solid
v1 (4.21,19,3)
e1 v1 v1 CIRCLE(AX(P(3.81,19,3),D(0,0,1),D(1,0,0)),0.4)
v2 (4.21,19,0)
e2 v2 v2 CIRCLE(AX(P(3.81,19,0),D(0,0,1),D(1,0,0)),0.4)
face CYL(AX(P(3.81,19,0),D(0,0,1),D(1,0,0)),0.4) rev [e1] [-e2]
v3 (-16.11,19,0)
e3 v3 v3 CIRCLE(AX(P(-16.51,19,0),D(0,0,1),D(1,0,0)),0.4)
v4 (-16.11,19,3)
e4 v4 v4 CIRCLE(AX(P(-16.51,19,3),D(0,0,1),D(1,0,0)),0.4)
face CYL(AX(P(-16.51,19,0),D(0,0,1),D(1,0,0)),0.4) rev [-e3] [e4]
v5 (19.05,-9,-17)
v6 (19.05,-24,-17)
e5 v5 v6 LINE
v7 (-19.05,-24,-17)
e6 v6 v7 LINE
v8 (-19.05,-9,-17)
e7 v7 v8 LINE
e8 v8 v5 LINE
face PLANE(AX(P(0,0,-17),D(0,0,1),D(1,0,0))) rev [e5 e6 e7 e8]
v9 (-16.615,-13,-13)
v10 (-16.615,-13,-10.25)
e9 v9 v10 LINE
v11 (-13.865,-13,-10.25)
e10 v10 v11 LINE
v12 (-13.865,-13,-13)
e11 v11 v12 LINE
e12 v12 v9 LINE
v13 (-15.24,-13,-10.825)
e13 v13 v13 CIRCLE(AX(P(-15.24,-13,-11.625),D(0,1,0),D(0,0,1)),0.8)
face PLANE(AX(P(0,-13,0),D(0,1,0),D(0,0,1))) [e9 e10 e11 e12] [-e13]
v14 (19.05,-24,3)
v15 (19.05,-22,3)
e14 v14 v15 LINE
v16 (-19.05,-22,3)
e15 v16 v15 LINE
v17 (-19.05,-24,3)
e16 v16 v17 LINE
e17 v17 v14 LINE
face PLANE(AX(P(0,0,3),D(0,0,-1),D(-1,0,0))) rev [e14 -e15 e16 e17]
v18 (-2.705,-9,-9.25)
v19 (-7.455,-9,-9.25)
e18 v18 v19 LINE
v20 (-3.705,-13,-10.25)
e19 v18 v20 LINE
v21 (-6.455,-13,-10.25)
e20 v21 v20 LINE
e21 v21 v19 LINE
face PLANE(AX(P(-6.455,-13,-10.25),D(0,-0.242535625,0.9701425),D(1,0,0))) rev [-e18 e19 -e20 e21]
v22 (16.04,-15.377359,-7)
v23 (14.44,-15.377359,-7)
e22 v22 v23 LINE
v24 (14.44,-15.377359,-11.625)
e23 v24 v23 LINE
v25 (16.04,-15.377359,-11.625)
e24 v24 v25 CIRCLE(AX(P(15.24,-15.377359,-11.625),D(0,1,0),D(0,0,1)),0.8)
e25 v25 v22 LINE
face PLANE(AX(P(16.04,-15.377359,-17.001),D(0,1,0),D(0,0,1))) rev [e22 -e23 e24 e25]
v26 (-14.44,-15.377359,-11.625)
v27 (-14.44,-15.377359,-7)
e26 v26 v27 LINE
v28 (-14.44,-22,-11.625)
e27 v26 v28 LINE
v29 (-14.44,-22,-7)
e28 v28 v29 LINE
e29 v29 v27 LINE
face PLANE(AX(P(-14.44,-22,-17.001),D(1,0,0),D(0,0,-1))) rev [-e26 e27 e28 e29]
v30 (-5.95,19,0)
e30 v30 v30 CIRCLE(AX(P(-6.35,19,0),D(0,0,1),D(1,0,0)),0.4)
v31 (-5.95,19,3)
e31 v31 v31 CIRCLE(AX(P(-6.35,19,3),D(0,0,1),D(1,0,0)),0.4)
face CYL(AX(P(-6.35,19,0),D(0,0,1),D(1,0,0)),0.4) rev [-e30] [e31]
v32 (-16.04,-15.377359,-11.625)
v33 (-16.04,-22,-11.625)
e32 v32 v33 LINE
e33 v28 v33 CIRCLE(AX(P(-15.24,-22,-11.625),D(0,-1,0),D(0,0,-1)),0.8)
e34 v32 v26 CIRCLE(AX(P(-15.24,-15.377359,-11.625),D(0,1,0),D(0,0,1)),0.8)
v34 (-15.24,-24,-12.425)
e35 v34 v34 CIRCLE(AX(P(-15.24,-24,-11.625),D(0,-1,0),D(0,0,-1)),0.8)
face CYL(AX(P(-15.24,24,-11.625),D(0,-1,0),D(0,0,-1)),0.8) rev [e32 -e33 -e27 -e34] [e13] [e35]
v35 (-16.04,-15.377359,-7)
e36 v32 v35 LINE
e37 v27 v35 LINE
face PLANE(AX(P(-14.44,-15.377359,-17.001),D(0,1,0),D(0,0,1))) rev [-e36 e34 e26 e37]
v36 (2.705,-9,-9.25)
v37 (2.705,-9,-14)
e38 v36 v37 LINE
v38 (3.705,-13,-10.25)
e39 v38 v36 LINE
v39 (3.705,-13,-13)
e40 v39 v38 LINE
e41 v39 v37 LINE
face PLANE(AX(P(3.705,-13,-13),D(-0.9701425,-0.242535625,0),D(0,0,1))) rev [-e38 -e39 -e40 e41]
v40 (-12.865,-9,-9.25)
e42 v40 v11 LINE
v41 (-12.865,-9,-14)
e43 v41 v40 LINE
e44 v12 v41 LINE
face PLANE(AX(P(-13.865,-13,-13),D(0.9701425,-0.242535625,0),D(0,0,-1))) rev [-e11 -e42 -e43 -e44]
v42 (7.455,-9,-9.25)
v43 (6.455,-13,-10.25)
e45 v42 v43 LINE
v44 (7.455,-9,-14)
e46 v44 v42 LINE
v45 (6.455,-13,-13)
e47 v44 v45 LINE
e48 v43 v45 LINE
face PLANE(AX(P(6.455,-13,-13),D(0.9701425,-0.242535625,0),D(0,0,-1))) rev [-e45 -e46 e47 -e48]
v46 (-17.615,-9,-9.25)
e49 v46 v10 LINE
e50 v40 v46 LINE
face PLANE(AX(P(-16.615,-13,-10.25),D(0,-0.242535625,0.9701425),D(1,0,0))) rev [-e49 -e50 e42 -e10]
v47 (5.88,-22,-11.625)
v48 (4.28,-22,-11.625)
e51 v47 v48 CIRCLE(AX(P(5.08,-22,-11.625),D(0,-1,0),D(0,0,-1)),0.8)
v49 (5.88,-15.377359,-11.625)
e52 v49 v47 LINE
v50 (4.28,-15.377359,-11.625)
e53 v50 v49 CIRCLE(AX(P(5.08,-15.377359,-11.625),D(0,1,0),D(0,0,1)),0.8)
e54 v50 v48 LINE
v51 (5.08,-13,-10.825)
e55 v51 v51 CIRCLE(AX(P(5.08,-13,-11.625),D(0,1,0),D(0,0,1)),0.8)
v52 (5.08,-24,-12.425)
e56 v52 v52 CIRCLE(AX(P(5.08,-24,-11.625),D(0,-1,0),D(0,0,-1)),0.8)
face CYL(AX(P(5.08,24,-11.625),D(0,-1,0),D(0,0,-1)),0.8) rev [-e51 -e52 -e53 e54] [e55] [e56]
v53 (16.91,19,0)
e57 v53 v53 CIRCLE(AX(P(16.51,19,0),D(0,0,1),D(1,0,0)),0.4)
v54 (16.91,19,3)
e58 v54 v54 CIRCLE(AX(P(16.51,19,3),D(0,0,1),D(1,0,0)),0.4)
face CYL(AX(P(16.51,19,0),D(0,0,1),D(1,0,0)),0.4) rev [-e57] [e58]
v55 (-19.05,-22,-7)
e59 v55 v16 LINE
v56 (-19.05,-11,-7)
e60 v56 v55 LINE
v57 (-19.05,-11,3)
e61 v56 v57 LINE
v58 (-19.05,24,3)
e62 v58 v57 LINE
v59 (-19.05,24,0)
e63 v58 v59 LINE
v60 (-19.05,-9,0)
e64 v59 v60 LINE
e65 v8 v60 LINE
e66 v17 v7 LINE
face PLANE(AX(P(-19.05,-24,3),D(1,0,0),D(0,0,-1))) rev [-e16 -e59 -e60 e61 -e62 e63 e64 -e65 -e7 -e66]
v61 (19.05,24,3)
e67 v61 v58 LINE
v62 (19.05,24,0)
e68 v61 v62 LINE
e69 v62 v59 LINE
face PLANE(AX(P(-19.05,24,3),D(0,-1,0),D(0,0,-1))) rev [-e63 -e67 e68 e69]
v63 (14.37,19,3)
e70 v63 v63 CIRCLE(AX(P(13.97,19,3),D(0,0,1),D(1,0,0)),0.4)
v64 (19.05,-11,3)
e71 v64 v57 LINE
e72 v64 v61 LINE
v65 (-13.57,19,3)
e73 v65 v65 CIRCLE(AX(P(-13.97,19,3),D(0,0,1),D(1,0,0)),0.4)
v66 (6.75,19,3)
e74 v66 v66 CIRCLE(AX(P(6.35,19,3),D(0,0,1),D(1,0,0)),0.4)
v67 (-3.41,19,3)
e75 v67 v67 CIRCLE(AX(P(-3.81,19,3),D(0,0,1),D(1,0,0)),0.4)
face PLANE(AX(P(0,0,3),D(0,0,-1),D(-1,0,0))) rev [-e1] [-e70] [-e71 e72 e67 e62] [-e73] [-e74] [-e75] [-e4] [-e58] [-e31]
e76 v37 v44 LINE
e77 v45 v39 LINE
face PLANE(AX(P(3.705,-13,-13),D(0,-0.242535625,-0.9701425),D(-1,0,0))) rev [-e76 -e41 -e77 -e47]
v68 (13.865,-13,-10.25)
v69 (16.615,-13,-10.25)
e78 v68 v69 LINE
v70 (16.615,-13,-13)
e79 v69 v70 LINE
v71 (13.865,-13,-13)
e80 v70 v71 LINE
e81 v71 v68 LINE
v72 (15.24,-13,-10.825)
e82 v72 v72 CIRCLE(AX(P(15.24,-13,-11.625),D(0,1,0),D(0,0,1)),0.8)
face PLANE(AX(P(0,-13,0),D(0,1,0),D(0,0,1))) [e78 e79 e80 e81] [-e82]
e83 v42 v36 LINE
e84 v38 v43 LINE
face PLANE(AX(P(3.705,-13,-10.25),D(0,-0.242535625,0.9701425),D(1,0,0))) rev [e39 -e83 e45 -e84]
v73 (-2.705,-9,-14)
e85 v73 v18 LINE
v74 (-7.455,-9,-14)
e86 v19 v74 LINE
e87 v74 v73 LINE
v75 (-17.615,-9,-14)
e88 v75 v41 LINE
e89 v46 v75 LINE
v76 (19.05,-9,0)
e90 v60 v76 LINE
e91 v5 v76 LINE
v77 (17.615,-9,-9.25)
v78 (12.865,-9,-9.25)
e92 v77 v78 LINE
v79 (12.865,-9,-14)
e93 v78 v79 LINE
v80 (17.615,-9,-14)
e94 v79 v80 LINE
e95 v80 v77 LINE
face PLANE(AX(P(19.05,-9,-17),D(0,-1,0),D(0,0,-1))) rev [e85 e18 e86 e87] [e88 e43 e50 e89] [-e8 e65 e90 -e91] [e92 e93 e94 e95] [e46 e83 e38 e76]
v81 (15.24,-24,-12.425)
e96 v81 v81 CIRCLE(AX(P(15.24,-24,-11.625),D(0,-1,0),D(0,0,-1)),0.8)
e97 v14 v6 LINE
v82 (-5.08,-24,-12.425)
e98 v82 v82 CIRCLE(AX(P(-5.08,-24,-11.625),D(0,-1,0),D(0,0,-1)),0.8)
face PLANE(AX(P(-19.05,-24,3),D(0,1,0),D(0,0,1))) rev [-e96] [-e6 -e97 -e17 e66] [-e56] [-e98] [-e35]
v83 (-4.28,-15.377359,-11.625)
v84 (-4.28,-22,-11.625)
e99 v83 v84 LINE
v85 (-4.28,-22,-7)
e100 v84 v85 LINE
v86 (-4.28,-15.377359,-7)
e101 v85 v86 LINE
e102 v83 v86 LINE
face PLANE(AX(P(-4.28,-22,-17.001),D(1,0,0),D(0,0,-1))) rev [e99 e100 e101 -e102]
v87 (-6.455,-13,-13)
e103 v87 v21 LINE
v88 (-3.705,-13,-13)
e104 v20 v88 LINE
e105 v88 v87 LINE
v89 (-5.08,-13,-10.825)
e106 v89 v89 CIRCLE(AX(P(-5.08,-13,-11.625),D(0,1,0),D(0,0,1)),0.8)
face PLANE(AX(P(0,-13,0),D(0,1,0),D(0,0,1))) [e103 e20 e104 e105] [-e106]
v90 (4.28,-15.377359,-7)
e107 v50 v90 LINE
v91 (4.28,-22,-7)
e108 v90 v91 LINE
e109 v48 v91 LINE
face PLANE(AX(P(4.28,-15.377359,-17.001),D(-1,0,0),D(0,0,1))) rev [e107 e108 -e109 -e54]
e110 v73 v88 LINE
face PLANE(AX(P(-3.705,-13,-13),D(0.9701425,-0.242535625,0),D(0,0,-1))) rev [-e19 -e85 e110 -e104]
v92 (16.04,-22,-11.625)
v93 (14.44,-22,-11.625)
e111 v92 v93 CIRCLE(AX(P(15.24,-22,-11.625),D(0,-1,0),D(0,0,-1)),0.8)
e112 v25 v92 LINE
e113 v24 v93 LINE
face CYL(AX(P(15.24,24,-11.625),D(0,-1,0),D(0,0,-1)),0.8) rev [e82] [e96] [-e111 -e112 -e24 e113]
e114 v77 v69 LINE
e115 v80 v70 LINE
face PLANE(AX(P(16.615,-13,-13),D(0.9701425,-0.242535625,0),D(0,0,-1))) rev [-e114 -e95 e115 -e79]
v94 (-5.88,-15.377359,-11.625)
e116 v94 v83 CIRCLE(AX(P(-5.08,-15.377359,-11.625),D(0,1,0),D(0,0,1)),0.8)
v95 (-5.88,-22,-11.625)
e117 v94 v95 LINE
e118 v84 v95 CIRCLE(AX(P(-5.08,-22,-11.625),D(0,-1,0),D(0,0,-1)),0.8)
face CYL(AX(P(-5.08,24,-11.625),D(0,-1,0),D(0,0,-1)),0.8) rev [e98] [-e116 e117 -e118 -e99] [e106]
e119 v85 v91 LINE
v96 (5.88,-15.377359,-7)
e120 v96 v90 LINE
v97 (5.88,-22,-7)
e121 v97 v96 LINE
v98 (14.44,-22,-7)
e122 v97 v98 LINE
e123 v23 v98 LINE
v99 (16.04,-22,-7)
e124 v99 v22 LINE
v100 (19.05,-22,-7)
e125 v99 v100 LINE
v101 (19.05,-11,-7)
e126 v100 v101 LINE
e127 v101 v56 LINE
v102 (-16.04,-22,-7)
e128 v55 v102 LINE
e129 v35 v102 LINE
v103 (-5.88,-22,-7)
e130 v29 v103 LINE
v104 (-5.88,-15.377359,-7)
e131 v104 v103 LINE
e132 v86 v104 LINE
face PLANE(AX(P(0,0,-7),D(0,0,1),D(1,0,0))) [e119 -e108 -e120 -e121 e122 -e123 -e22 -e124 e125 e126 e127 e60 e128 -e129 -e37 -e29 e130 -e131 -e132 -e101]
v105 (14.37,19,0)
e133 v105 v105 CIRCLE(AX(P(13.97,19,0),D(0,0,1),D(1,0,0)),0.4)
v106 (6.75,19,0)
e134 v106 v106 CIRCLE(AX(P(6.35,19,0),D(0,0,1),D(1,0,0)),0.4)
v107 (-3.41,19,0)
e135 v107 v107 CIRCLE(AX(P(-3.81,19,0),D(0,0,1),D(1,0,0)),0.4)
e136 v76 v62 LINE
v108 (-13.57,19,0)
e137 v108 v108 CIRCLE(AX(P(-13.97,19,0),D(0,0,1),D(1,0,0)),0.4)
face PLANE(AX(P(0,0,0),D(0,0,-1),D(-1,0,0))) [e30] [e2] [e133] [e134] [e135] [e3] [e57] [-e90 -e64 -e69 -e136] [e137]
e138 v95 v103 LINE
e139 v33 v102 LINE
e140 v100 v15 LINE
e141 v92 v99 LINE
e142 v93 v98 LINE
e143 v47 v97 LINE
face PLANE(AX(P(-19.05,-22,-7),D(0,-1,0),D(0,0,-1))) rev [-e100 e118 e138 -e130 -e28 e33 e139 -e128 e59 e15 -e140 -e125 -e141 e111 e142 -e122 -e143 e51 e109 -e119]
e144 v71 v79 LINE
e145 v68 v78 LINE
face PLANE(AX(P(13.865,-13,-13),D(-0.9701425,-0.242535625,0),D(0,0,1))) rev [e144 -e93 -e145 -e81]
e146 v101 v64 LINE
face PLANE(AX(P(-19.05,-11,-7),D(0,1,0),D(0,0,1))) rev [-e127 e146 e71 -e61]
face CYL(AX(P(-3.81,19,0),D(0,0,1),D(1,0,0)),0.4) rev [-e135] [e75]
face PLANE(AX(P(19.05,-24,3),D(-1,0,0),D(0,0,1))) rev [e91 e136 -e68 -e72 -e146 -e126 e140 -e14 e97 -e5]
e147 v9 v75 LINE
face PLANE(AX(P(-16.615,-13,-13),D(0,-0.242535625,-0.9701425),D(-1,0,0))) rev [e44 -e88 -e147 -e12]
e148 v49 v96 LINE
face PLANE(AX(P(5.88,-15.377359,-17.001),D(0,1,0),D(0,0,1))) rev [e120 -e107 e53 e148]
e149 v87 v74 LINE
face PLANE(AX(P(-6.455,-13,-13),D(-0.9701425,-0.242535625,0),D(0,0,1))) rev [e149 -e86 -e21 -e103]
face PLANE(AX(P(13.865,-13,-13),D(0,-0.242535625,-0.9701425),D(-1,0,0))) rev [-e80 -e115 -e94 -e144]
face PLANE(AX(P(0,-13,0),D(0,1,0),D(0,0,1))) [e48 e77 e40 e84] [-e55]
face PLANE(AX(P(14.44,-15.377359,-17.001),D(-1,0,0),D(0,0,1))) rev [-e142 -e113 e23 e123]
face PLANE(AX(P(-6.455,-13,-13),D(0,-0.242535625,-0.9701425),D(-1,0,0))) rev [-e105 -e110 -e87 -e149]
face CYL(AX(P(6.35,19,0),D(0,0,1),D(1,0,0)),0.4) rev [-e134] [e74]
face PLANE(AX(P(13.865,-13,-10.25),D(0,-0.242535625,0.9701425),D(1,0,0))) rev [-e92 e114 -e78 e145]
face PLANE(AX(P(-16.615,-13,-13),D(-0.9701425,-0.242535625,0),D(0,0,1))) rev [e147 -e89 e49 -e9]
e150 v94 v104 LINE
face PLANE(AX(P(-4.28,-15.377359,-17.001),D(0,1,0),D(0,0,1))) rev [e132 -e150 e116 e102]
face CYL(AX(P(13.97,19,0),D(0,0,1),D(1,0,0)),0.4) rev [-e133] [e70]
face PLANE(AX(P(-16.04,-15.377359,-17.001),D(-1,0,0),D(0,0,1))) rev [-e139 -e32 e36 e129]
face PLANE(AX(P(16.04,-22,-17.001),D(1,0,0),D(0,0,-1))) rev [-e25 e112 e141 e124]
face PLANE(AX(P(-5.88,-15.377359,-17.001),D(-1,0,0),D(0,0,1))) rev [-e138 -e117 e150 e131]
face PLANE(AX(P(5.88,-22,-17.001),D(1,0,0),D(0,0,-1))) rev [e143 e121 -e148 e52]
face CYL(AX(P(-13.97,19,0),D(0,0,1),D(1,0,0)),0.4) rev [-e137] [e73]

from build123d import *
from OCP.BRepFilletAPI import BRepFilletAPI_MakeChamfer

# Parameters (mm, degrees)
SKETCH_1_W          = 38.1
SKETCH_1_H          = 48
EXTRUDE_1_DEPTH     = 3
SKETCH_2_R          = 0.4
CUT_EXTRUDE_1_DEPTH = 31.78802527
SKETCH_3_W          = 38.1
SKETCH_3_H          = 15
EXTRUDE_2_DEPTH     = 17
SKETCH_4_W          = 2.75
SKETCH_4_H          = 2.75
CUT_EXTRUDE_2_DEPTH = 4
CHAMFER_1_SIZE      = 1
CHAMFER_1_SIZE_2    = 4
SKETCH_5_R          = 0.8
CUT_EXTRUDE_5_DEPTH = 55.36821222
SKETCH_6_W          = 38.1
SKETCH_6_H          = 11
CUT_EXTRUDE_6_DEPTH = 10
CUT_EXTRUDE_7_REACH = 34.232
SKETCH_8_W          = 1.6
SKETCH_8_H          = 6.622641265


with BuildPart() as part:
    # 草圖1 → 填料-伸長1 (new body)
    with BuildSketch(Plane.XY):
        Rectangle(SKETCH_1_W, SKETCH_1_H)
    extrude(amount=EXTRUDE_1_DEPTH)

    # 草圖2 → 除料-伸長1 (cut, through all)
    with BuildSketch(Plane.XY.offset(3)):
        with Locations((-16.51, 19)):
            Circle(SKETCH_2_R)
        with Locations((-13.97, 19)):
            Circle(SKETCH_2_R)
        with Locations((-6.35, 19)):
            Circle(SKETCH_2_R)
        with Locations((-3.81, 19)):
            Circle(SKETCH_2_R)
        with Locations((3.81, 19)):
            Circle(SKETCH_2_R)
        with Locations((6.35, 19)):
            Circle(SKETCH_2_R)
        with Locations((13.97, 19)):
            Circle(SKETCH_2_R)
        with Locations((16.51, 19)):
            Circle(SKETCH_2_R)
    extrude(amount=-CUT_EXTRUDE_1_DEPTH, mode=Mode.SUBTRACT)

    # 草圖3 → 填料-伸長2 (add)
    with BuildSketch(Plane(origin=(0, 0, 0), x_dir=(-1, 0, 0), z_dir=(0, 0, -1))):
        with Locations((0, -16.5)):
            Rectangle(SKETCH_3_W, SKETCH_3_H)
    extrude(amount=EXTRUDE_2_DEPTH)

    # 草圖4 → 除料-伸長2 (cut)
    with BuildSketch(Plane(origin=(0, -9, 0), x_dir=(1, 0, 0), z_dir=(0, 1, 0))):
        with Locations((-15.24, 11.625)):
            Rectangle(SKETCH_4_W, SKETCH_4_H)
        with Locations((-5.08, 11.625)):
            Rectangle(SKETCH_4_W, SKETCH_4_H)
        with Locations((5.08, 11.625)):
            Rectangle(SKETCH_4_W, SKETCH_4_H)
        with Locations((15.24, 11.625)):
            Rectangle(SKETCH_4_W, SKETCH_4_H)
    extrude(amount=-CUT_EXTRUDE_2_DEPTH, mode=Mode.SUBTRACT)

    # 導角1
    chamfer_1_edges_1 = [part.edges().sort_by_distance(p)[0] for p in [
        (-15.24, -9, -13),
    ]]
    chamfer_1_side_1 = [part.faces().sort_by_distance(p)[0] for p in [
        (-15.24, -9, -13.02),
    ]]
    chamfer_1_edges_2 = [part.edges().sort_by_distance(p)[0] for p in [
        (-13.865, -9, -11.625),
    ]]
    chamfer_1_side_2 = [part.faces().sort_by_distance(p)[0] for p in [
        (-13.845, -9, -11.625),
    ]]
    chamfer_1_edges_3 = [part.edges().sort_by_distance(p)[0] for p in [
        (-16.615, -9, -11.625),
    ]]
    chamfer_1_side_3 = [part.faces().sort_by_distance(p)[0] for p in [
        (-16.635, -9, -11.625),
    ]]
    chamfer_1_edges_4 = [part.edges().sort_by_distance(p)[0] for p in [
        (-15.24, -9, -10.25),
    ]]
    chamfer_1_side_4 = [part.faces().sort_by_distance(p)[0] for p in [
        (-15.24, -9, -10.23),
    ]]
    chamfer_1_edges_5 = [part.edges().sort_by_distance(p)[0] for p in [
        (15.24, -9, -10.25),
    ]]
    chamfer_1_side_5 = [part.faces().sort_by_distance(p)[0] for p in [
        (15.24, -9, -10.23),
    ]]
    chamfer_1_edges_6 = [part.edges().sort_by_distance(p)[0] for p in [
        (13.865, -9, -11.625),
    ]]
    chamfer_1_side_6 = [part.faces().sort_by_distance(p)[0] for p in [
        (13.845, -9, -11.625),
    ]]
    chamfer_1_edges_7 = [part.edges().sort_by_distance(p)[0] for p in [
        (16.615, -9, -11.625),
    ]]
    chamfer_1_side_7 = [part.faces().sort_by_distance(p)[0] for p in [
        (16.635, -9, -11.625),
    ]]
    chamfer_1_edges_8 = [part.edges().sort_by_distance(p)[0] for p in [
        (15.24, -9, -13),
    ]]
    chamfer_1_side_8 = [part.faces().sort_by_distance(p)[0] for p in [
        (15.24, -9, -13.02),
    ]]
    chamfer_1_edges_9 = [part.edges().sort_by_distance(p)[0] for p in [
        (5.08, -9, -10.25),
    ]]
    chamfer_1_side_9 = [part.faces().sort_by_distance(p)[0] for p in [
        (5.08, -9, -10.23),
    ]]
    chamfer_1_edges_10 = [part.edges().sort_by_distance(p)[0] for p in [
        (6.455, -9, -11.625),
    ]]
    chamfer_1_side_10 = [part.faces().sort_by_distance(p)[0] for p in [
        (6.475, -9, -11.625),
    ]]
    chamfer_1_edges_11 = [part.edges().sort_by_distance(p)[0] for p in [
        (5.08, -9, -13),
    ]]
    chamfer_1_side_11 = [part.faces().sort_by_distance(p)[0] for p in [
        (5.08, -9, -13.02),
    ]]
    chamfer_1_edges_12 = [part.edges().sort_by_distance(p)[0] for p in [
        (3.705, -9, -11.625),
    ]]
    chamfer_1_side_12 = [part.faces().sort_by_distance(p)[0] for p in [
        (3.685, -9, -11.625),
    ]]
    chamfer_1_edges_13 = [part.edges().sort_by_distance(p)[0] for p in [
        (-5.08, -9, -10.25),
    ]]
    chamfer_1_side_13 = [part.faces().sort_by_distance(p)[0] for p in [
        (-5.08, -9, -10.23),
    ]]
    chamfer_1_edges_14 = [part.edges().sort_by_distance(p)[0] for p in [
        (-6.455, -9, -11.625),
    ]]
    chamfer_1_side_14 = [part.faces().sort_by_distance(p)[0] for p in [
        (-6.475, -9, -11.625),
    ]]
    chamfer_1_edges_15 = [part.edges().sort_by_distance(p)[0] for p in [
        (-5.08, -9, -13),
    ]]
    chamfer_1_side_15 = [part.faces().sort_by_distance(p)[0] for p in [
        (-5.08, -9, -13.02),
    ]]
    chamfer_1_edges_16 = [part.edges().sort_by_distance(p)[0] for p in [
        (-3.705, -9, -11.625),
    ]]
    chamfer_1_side_16 = [part.faces().sort_by_distance(p)[0] for p in [
        (-3.685, -9, -11.625),
    ]]
    chamfer_1 = BRepFilletAPI_MakeChamfer(part.part.solid().wrapped)
    for e in chamfer_1_edges_1:
        chamfer_1.Add(CHAMFER_1_SIZE - 0.0001, CHAMFER_1_SIZE_2 - 0.0001, e.wrapped, chamfer_1_side_1[0].wrapped)
    for e in chamfer_1_edges_2:
        chamfer_1.Add(CHAMFER_1_SIZE - 0.0001, CHAMFER_1_SIZE_2 - 0.0001, e.wrapped, chamfer_1_side_2[0].wrapped)
    for e in chamfer_1_edges_3:
        chamfer_1.Add(CHAMFER_1_SIZE - 0.0001, CHAMFER_1_SIZE_2 - 0.0001, e.wrapped, chamfer_1_side_3[0].wrapped)
    for e in chamfer_1_edges_4:
        chamfer_1.Add(CHAMFER_1_SIZE - 0.0001, CHAMFER_1_SIZE_2 - 0.0001, e.wrapped, chamfer_1_side_4[0].wrapped)
    for e in chamfer_1_edges_5:
        chamfer_1.Add(CHAMFER_1_SIZE - 0.0001, CHAMFER_1_SIZE_2 - 0.0001, e.wrapped, chamfer_1_side_5[0].wrapped)
    for e in chamfer_1_edges_6:
        chamfer_1.Add(CHAMFER_1_SIZE - 0.0001, CHAMFER_1_SIZE_2 - 0.0001, e.wrapped, chamfer_1_side_6[0].wrapped)
    for e in chamfer_1_edges_7:
        chamfer_1.Add(CHAMFER_1_SIZE - 0.0001, CHAMFER_1_SIZE_2 - 0.0001, e.wrapped, chamfer_1_side_7[0].wrapped)
    for e in chamfer_1_edges_8:
        chamfer_1.Add(CHAMFER_1_SIZE - 0.0001, CHAMFER_1_SIZE_2 - 0.0001, e.wrapped, chamfer_1_side_8[0].wrapped)
    for e in chamfer_1_edges_9:
        chamfer_1.Add(CHAMFER_1_SIZE - 0.0001, CHAMFER_1_SIZE_2 - 0.0001, e.wrapped, chamfer_1_side_9[0].wrapped)
    for e in chamfer_1_edges_10:
        chamfer_1.Add(CHAMFER_1_SIZE - 0.0001, CHAMFER_1_SIZE_2 - 0.0001, e.wrapped, chamfer_1_side_10[0].wrapped)
    for e in chamfer_1_edges_11:
        chamfer_1.Add(CHAMFER_1_SIZE - 0.0001, CHAMFER_1_SIZE_2 - 0.0001, e.wrapped, chamfer_1_side_11[0].wrapped)
    for e in chamfer_1_edges_12:
        chamfer_1.Add(CHAMFER_1_SIZE - 0.0001, CHAMFER_1_SIZE_2 - 0.0001, e.wrapped, chamfer_1_side_12[0].wrapped)
    for e in chamfer_1_edges_13:
        chamfer_1.Add(CHAMFER_1_SIZE - 0.0001, CHAMFER_1_SIZE_2 - 0.0001, e.wrapped, chamfer_1_side_13[0].wrapped)
    for e in chamfer_1_edges_14:
        chamfer_1.Add(CHAMFER_1_SIZE - 0.0001, CHAMFER_1_SIZE_2 - 0.0001, e.wrapped, chamfer_1_side_14[0].wrapped)
    for e in chamfer_1_edges_15:
        chamfer_1.Add(CHAMFER_1_SIZE - 0.0001, CHAMFER_1_SIZE_2 - 0.0001, e.wrapped, chamfer_1_side_15[0].wrapped)
    for e in chamfer_1_edges_16:
        chamfer_1.Add(CHAMFER_1_SIZE - 0.0001, CHAMFER_1_SIZE_2 - 0.0001, e.wrapped, chamfer_1_side_16[0].wrapped)
    add(Compound.cast(chamfer_1.Shape()), mode=Mode.REPLACE)  # a hair under: the kernel refuses the full size

    # 草圖5 → 除料-伸長5 (cut, through all)
    with BuildSketch(Plane.XZ.offset(24)):
        with Locations(Location((-15.24, -11.625, 0), (0, 0, 270))):
            Circle(SKETCH_5_R)
        with Locations(Location((-5.08, -11.625, 0), (0, 0, 270))):
            Circle(SKETCH_5_R)
        with Locations(Location((5.08, -11.625, 0), (0, 0, 270))):
            Circle(SKETCH_5_R)
        with Locations(Location((15.24, -11.625, 0), (0, 0, 270))):
            Circle(SKETCH_5_R)
    extrude(amount=-CUT_EXTRUDE_5_DEPTH, mode=Mode.SUBTRACT)

    # 草圖6 → 除料-伸長6 (cut)
    with BuildSketch(Plane.XY.offset(3)):
        with Locations((0, -16.5)):
            Rectangle(SKETCH_6_W, SKETCH_6_H)
    extrude(amount=-CUT_EXTRUDE_6_DEPTH, mode=Mode.SUBTRACT)

    # 草圖8 → 除料-伸長7 (cut, up to next)
    with BuildSketch(Plane.XY.offset(-7), mode=Mode.PRIVATE) as cut_extrude_7_sk1:
        with Locations((-15.24, -18.688679368)):
            Rectangle(SKETCH_8_W, SKETCH_8_H)
    cut_extrude_7_tool1 = extrude(cut_extrude_7_sk1.sketch, amount=-CUT_EXTRUDE_7_REACH, mode=Mode.PRIVATE) & part.part
    # 草圖8 → 除料-伸長7 (cut, up to next)
    with BuildSketch(Plane.XY.offset(-7), mode=Mode.PRIVATE) as cut_extrude_7_sk2:
        with Locations((-5.08, -18.688679368)):
            Rectangle(SKETCH_8_W, SKETCH_8_H)
    cut_extrude_7_tool2 = extrude(cut_extrude_7_sk2.sketch, amount=-CUT_EXTRUDE_7_REACH, mode=Mode.PRIVATE) & part.part
    # 草圖8 → 除料-伸長7 (cut, up to next)
    with BuildSketch(Plane.XY.offset(-7), mode=Mode.PRIVATE) as cut_extrude_7_sk3:
        with Locations((5.08, -18.688679368)):
            Rectangle(SKETCH_8_W, SKETCH_8_H)
    cut_extrude_7_tool3 = extrude(cut_extrude_7_sk3.sketch, amount=-CUT_EXTRUDE_7_REACH, mode=Mode.PRIVATE) & part.part
    # 草圖8 → 除料-伸長7 (cut, up to next)
    with BuildSketch(Plane.XY.offset(-7), mode=Mode.PRIVATE) as cut_extrude_7_sk4:
        with Locations((15.24, -18.688679368)):
            Rectangle(SKETCH_8_W, SKETCH_8_H)
    cut_extrude_7_tool4 = extrude(cut_extrude_7_sk4.sketch, amount=-CUT_EXTRUDE_7_REACH, mode=Mode.PRIVATE) & part.part
    add(cut_extrude_7_tool1.solids().sort_by_distance((-15.24, -18.688679, -7))[0], mode=Mode.SUBTRACT)
    add(cut_extrude_7_tool2.solids().sort_by_distance((-5.08, -18.688679, -7))[0], mode=Mode.SUBTRACT)
    add(cut_extrude_7_tool3.solids().sort_by_distance((5.08, -18.688679, -7))[0], mode=Mode.SUBTRACT)
    add(cut_extrude_7_tool4.solids().sort_by_distance((15.24, -18.688679, -7))[0], mode=Mode.SUBTRACT)


solid = part.part
